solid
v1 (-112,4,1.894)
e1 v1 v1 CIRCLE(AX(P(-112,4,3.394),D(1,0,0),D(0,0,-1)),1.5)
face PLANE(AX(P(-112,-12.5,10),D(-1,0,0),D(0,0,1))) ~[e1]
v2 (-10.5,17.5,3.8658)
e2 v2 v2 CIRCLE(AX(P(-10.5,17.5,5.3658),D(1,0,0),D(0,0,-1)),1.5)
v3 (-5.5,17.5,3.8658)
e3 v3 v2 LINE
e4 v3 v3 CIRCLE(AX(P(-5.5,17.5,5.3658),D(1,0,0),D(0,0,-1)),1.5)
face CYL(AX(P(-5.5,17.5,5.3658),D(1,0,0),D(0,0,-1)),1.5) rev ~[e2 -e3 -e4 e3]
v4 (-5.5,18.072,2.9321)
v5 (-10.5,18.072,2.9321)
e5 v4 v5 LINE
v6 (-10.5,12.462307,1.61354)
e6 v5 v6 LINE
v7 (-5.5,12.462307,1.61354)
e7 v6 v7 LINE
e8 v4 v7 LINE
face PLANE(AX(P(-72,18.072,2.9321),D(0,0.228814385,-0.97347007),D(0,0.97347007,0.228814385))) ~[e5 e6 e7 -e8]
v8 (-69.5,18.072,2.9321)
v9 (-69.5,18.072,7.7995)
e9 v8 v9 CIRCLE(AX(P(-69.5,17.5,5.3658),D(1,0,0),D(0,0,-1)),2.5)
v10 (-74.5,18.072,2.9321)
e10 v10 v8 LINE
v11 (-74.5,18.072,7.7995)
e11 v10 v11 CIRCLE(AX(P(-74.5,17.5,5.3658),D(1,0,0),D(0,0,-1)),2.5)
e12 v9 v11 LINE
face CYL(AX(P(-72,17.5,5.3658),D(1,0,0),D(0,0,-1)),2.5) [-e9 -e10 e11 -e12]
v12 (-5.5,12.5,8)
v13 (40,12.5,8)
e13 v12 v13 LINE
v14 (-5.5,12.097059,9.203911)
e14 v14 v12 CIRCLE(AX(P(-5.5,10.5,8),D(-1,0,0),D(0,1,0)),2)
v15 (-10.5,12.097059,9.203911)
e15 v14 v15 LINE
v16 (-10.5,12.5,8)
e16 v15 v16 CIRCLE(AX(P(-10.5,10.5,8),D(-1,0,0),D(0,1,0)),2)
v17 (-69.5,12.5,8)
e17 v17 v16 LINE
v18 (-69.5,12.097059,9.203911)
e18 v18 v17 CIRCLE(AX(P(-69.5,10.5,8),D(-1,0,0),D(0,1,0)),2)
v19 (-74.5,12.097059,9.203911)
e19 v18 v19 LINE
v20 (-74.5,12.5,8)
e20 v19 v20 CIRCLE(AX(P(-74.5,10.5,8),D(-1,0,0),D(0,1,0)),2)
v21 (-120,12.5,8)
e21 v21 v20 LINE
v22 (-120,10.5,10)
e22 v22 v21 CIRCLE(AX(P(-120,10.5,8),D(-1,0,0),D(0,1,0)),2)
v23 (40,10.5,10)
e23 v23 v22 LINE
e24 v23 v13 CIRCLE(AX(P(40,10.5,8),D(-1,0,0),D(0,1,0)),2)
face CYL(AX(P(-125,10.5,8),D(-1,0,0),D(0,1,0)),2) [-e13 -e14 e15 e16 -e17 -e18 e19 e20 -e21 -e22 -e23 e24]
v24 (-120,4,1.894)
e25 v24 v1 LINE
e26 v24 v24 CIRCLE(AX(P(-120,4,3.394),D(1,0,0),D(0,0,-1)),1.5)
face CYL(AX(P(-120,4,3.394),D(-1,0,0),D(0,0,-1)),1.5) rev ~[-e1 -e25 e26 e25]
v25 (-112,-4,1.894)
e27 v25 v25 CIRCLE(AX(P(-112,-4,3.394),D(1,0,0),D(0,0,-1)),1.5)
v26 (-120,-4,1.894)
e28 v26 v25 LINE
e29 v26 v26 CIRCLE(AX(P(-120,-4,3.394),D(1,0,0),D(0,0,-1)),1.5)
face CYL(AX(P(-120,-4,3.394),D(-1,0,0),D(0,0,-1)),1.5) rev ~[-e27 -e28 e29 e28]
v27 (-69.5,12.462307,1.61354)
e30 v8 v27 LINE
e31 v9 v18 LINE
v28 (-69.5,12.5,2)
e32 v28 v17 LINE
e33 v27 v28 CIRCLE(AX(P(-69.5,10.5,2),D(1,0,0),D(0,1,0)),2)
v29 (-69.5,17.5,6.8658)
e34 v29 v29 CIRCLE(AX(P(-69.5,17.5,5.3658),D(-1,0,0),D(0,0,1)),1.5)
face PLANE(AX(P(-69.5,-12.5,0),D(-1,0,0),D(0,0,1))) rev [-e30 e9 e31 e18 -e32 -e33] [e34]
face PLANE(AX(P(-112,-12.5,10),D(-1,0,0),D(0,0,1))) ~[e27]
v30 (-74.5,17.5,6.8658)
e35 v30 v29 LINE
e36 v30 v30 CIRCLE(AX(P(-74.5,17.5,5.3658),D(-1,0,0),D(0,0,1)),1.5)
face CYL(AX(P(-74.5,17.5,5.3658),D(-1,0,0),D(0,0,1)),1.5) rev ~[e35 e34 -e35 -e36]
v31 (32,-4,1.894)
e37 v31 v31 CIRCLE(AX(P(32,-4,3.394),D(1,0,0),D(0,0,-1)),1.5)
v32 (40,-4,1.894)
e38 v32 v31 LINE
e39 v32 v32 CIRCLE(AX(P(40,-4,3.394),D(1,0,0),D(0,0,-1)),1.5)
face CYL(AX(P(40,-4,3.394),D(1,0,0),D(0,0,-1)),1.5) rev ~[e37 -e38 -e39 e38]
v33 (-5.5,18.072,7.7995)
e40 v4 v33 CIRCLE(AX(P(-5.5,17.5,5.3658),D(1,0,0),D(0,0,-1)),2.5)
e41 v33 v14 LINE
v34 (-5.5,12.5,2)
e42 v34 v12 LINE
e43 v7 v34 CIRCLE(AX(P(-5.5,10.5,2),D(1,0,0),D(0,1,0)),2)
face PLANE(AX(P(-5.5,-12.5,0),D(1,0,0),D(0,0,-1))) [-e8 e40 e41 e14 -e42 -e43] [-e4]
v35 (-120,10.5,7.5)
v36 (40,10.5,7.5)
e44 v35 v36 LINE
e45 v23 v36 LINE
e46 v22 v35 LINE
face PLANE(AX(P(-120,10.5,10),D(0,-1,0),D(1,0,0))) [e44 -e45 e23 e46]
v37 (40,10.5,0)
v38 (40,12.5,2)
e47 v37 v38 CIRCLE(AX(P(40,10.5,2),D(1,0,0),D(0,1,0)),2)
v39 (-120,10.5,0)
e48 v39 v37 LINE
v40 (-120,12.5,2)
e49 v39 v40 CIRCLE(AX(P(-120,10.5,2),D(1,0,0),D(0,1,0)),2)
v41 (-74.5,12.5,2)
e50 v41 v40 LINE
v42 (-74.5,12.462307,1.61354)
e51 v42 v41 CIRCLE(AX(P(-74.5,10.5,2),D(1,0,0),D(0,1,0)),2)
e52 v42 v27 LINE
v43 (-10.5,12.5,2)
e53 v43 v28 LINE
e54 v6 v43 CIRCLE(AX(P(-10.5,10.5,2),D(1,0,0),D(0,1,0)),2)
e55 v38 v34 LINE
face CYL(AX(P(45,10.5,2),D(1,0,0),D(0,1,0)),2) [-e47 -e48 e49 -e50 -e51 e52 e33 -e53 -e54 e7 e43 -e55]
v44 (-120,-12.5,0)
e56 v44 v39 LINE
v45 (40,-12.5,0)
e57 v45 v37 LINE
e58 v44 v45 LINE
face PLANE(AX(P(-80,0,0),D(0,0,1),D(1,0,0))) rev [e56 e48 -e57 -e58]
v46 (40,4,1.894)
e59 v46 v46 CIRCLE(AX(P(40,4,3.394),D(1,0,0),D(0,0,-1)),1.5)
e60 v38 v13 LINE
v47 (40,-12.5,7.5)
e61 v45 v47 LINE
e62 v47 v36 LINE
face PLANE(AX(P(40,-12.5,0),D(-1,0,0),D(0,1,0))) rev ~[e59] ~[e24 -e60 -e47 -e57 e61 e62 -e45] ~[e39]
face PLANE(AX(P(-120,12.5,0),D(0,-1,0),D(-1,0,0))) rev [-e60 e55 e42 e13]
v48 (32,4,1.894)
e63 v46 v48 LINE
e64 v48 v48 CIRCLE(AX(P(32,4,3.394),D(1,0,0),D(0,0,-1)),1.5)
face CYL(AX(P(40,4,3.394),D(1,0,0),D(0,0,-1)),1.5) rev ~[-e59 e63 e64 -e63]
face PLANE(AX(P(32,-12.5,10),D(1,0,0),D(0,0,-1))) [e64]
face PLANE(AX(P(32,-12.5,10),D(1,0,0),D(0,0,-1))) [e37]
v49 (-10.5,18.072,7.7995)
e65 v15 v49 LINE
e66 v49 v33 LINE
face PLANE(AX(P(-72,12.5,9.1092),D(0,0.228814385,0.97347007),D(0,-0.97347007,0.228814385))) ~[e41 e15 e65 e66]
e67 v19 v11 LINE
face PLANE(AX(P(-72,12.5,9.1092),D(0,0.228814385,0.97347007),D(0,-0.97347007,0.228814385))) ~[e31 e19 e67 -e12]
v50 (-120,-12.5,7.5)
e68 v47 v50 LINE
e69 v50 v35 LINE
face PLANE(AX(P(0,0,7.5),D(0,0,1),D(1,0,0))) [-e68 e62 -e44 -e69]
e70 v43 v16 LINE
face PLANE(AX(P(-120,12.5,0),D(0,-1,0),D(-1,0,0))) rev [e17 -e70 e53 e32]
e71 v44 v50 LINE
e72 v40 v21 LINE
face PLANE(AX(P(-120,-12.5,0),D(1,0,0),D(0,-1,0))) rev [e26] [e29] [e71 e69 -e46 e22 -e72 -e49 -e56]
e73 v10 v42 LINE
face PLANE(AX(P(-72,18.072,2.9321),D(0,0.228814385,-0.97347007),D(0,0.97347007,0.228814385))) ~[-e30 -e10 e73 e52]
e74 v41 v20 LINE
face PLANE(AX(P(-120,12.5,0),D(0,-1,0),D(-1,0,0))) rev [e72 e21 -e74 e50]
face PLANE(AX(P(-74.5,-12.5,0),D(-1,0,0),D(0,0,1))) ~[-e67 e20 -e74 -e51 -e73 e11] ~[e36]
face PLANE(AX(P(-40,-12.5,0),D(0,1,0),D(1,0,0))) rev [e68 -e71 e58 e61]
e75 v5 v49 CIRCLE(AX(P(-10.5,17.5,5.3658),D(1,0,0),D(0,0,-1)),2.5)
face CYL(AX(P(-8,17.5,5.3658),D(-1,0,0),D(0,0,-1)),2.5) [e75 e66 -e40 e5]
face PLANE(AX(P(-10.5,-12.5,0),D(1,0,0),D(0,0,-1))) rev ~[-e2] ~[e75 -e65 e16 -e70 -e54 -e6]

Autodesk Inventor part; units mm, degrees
sketch "Sketch1" plane through (0, 0, 0) normal (0, 0, 1) x (1, 0, 0)
  line L0 (40, 12.5) -> (-40, 12.5)
  line L1 (-40, 12.5) -> (-40, -12.5)
  line L2 (-40, -12.5) -> (40, -12.5)
  line L3 (40, -12.5) -> (40, 12.5)
  line L4 (40, 12.5) -> (-40, -12.5) construction
  line L5 (-40, 12.5) -> (40, -12.5) construction
  point P0 (0, 0)
  dimension "d0" = 80
  dimension "d1" = 25
extrude "Extrusion1" add sketch "Sketch1" along normal blind 10
ref_plane "Work Plane1" through (-8, -12.5, 0) normal (1, 0, 0) x (0, 0, -1)
sketch "Sketch2" plane through (-8, -12.5, 0) normal (1, 0, 0) x (0, 0, -1)
  circle A0 centre (-5.3658, 30) radius 2.5
  line L0 (0, 25) -> (-10, 25) projected
  line L1 (-9.1092, 25) -> (-7.7995, 30.572)
  line L2 (-2.9321, 30.572) -> (-1.6224, 25)
  point P0 (0, 12.5)
  dimension "d5" = 5
  dimension "d11" = 5
extrude "Extrusion2" add sketch "Sketch2" along normal mid plane 5
sketch "Sketch3" plane through (-5.5, -12.5, 0) normal (1, 0, 0) x (0, 0, -1)
  arc A0 (-2.9321, 30.572) -> (-7.7995, 30.572) centre (-5.3658, 30) ccw projected
  circle A1 centre (-5.3658, 30) radius 1.5
  point P0 (0, 12.5)
  dimension "d8" = 3
extrude "Extrusion3" cut sketch "Sketch3" against normal blind 20
sketch "Sketch4" plane through (0, 0, 0) normal (0, 0, -1) x (-1, 0, 0)
  point P0 (0, 0)
sketch "Sketch5" plane through (-40, -12.5, 0) normal (-1, 0, 0) x (0, 0, 1)
  point P0 (0, 12.5)
ref_plane "Work Plane2" through (-40, -12.5, 0) normal (-1, 0, 0) x (0, 0, 1)
mirror "Mirror1" about plane through (-40, 12.5, 0) normal (-1, 0, 0) of "Extrusion2", "Extrusion1"
fillet "Fillet1" radius 2 2 edges at (-40, 12.5, 10) (-40, 12.5, 0)
sketch "Sketch6" plane through (-74.5, 17.5, 5.3658) normal (-1, 0, 0) x (0, 0, 1)
  circle A0 centre (0, 0) radius 1.5
  point P0 (-5.3658, -17.5)
extrude "Extrusion4" cut sketch "Sketch6" against normal blind 20
ref_plane "Work Plane3" through (20, 10.5, 6) normal (0, 0, -1) x (-1, 0, 0)
sketch "Sketch7" plane through (40, -12.5, 10) normal (1, 0, 0) x (0, 0, -1)
  circle A0 centre (6.606, 16.5) radius 1.5
  circle A1 centre (6.606, 8.5) radius 1.5
  line L0 (10, 0) -> (0, 0) projected
  line L1 (10, 0) -> (10, 23) projected
  point P0 (10, 12.5)
  point P1 (5, 0)
  dimension "d16" = 3
  dimension "d17" = 3
  dimension "d19" = 8.5
  dimension "d20" = 8
  dimension "d32" = 3.394
  dimension "d33" = 3.394
extrude "Extrusion5" cut sketch "Sketch7" against normal blind 8
ref_plane "Work Plane4" through (-120, -12.5, 0) normal (-1, 0, 0) x (0, 0, 1)
mirror "Mirror2" about plane through (-40, -12.5, 0) normal (-1, 0, 0) of "Extrusion5"
thread "Thread1" size "M3x0.5" class "6H" standard "ANSI Metric M Profile" length 10
thread "Thread2" size "M3x0.5" class "6H" standard "ANSI Metric M Profile" length 10
thread "Thread3" size "M3x0.5" class "6H" standard "ANSI Metric M Profile" length 10
thread "Thread4" size "M3x0.5" class "6H" standard "ANSI Metric M Profile" length 10
sketch "Sketch8" plane through (0, 0, 0) normal (0, 0, -1) x (-1, 0, 0)
  line L0 (-40, 10.5) -> (120, 10.5) construction
  line L1 (-40, -12.5) -> (-40, 10.5) construction
  line L2 (-40, -12.5) -> (120, -12.5) construction
  line L3 (120, -12.5) -> (120, 10.5) projected
  point P0 (0, 0)
sketch "Sketch9" plane through (0, 0, 10) normal (0, 0, 1) x (1, 0, 0)
  line L0 (-120, 10.5) -> (40, 10.5) projected
  line L1 (-120, -12.5) -> (-120, 10.5) projected
  line L2 (40, -12.5) -> (-120, -12.5) projected
  line L3 (40, -12.5) -> (40, 10.5) projected
  point P0 (0, 0)
extrude "Extrusion6" cut sketch "Sketch9" against normal blind 2.5
properties part number "plate"
